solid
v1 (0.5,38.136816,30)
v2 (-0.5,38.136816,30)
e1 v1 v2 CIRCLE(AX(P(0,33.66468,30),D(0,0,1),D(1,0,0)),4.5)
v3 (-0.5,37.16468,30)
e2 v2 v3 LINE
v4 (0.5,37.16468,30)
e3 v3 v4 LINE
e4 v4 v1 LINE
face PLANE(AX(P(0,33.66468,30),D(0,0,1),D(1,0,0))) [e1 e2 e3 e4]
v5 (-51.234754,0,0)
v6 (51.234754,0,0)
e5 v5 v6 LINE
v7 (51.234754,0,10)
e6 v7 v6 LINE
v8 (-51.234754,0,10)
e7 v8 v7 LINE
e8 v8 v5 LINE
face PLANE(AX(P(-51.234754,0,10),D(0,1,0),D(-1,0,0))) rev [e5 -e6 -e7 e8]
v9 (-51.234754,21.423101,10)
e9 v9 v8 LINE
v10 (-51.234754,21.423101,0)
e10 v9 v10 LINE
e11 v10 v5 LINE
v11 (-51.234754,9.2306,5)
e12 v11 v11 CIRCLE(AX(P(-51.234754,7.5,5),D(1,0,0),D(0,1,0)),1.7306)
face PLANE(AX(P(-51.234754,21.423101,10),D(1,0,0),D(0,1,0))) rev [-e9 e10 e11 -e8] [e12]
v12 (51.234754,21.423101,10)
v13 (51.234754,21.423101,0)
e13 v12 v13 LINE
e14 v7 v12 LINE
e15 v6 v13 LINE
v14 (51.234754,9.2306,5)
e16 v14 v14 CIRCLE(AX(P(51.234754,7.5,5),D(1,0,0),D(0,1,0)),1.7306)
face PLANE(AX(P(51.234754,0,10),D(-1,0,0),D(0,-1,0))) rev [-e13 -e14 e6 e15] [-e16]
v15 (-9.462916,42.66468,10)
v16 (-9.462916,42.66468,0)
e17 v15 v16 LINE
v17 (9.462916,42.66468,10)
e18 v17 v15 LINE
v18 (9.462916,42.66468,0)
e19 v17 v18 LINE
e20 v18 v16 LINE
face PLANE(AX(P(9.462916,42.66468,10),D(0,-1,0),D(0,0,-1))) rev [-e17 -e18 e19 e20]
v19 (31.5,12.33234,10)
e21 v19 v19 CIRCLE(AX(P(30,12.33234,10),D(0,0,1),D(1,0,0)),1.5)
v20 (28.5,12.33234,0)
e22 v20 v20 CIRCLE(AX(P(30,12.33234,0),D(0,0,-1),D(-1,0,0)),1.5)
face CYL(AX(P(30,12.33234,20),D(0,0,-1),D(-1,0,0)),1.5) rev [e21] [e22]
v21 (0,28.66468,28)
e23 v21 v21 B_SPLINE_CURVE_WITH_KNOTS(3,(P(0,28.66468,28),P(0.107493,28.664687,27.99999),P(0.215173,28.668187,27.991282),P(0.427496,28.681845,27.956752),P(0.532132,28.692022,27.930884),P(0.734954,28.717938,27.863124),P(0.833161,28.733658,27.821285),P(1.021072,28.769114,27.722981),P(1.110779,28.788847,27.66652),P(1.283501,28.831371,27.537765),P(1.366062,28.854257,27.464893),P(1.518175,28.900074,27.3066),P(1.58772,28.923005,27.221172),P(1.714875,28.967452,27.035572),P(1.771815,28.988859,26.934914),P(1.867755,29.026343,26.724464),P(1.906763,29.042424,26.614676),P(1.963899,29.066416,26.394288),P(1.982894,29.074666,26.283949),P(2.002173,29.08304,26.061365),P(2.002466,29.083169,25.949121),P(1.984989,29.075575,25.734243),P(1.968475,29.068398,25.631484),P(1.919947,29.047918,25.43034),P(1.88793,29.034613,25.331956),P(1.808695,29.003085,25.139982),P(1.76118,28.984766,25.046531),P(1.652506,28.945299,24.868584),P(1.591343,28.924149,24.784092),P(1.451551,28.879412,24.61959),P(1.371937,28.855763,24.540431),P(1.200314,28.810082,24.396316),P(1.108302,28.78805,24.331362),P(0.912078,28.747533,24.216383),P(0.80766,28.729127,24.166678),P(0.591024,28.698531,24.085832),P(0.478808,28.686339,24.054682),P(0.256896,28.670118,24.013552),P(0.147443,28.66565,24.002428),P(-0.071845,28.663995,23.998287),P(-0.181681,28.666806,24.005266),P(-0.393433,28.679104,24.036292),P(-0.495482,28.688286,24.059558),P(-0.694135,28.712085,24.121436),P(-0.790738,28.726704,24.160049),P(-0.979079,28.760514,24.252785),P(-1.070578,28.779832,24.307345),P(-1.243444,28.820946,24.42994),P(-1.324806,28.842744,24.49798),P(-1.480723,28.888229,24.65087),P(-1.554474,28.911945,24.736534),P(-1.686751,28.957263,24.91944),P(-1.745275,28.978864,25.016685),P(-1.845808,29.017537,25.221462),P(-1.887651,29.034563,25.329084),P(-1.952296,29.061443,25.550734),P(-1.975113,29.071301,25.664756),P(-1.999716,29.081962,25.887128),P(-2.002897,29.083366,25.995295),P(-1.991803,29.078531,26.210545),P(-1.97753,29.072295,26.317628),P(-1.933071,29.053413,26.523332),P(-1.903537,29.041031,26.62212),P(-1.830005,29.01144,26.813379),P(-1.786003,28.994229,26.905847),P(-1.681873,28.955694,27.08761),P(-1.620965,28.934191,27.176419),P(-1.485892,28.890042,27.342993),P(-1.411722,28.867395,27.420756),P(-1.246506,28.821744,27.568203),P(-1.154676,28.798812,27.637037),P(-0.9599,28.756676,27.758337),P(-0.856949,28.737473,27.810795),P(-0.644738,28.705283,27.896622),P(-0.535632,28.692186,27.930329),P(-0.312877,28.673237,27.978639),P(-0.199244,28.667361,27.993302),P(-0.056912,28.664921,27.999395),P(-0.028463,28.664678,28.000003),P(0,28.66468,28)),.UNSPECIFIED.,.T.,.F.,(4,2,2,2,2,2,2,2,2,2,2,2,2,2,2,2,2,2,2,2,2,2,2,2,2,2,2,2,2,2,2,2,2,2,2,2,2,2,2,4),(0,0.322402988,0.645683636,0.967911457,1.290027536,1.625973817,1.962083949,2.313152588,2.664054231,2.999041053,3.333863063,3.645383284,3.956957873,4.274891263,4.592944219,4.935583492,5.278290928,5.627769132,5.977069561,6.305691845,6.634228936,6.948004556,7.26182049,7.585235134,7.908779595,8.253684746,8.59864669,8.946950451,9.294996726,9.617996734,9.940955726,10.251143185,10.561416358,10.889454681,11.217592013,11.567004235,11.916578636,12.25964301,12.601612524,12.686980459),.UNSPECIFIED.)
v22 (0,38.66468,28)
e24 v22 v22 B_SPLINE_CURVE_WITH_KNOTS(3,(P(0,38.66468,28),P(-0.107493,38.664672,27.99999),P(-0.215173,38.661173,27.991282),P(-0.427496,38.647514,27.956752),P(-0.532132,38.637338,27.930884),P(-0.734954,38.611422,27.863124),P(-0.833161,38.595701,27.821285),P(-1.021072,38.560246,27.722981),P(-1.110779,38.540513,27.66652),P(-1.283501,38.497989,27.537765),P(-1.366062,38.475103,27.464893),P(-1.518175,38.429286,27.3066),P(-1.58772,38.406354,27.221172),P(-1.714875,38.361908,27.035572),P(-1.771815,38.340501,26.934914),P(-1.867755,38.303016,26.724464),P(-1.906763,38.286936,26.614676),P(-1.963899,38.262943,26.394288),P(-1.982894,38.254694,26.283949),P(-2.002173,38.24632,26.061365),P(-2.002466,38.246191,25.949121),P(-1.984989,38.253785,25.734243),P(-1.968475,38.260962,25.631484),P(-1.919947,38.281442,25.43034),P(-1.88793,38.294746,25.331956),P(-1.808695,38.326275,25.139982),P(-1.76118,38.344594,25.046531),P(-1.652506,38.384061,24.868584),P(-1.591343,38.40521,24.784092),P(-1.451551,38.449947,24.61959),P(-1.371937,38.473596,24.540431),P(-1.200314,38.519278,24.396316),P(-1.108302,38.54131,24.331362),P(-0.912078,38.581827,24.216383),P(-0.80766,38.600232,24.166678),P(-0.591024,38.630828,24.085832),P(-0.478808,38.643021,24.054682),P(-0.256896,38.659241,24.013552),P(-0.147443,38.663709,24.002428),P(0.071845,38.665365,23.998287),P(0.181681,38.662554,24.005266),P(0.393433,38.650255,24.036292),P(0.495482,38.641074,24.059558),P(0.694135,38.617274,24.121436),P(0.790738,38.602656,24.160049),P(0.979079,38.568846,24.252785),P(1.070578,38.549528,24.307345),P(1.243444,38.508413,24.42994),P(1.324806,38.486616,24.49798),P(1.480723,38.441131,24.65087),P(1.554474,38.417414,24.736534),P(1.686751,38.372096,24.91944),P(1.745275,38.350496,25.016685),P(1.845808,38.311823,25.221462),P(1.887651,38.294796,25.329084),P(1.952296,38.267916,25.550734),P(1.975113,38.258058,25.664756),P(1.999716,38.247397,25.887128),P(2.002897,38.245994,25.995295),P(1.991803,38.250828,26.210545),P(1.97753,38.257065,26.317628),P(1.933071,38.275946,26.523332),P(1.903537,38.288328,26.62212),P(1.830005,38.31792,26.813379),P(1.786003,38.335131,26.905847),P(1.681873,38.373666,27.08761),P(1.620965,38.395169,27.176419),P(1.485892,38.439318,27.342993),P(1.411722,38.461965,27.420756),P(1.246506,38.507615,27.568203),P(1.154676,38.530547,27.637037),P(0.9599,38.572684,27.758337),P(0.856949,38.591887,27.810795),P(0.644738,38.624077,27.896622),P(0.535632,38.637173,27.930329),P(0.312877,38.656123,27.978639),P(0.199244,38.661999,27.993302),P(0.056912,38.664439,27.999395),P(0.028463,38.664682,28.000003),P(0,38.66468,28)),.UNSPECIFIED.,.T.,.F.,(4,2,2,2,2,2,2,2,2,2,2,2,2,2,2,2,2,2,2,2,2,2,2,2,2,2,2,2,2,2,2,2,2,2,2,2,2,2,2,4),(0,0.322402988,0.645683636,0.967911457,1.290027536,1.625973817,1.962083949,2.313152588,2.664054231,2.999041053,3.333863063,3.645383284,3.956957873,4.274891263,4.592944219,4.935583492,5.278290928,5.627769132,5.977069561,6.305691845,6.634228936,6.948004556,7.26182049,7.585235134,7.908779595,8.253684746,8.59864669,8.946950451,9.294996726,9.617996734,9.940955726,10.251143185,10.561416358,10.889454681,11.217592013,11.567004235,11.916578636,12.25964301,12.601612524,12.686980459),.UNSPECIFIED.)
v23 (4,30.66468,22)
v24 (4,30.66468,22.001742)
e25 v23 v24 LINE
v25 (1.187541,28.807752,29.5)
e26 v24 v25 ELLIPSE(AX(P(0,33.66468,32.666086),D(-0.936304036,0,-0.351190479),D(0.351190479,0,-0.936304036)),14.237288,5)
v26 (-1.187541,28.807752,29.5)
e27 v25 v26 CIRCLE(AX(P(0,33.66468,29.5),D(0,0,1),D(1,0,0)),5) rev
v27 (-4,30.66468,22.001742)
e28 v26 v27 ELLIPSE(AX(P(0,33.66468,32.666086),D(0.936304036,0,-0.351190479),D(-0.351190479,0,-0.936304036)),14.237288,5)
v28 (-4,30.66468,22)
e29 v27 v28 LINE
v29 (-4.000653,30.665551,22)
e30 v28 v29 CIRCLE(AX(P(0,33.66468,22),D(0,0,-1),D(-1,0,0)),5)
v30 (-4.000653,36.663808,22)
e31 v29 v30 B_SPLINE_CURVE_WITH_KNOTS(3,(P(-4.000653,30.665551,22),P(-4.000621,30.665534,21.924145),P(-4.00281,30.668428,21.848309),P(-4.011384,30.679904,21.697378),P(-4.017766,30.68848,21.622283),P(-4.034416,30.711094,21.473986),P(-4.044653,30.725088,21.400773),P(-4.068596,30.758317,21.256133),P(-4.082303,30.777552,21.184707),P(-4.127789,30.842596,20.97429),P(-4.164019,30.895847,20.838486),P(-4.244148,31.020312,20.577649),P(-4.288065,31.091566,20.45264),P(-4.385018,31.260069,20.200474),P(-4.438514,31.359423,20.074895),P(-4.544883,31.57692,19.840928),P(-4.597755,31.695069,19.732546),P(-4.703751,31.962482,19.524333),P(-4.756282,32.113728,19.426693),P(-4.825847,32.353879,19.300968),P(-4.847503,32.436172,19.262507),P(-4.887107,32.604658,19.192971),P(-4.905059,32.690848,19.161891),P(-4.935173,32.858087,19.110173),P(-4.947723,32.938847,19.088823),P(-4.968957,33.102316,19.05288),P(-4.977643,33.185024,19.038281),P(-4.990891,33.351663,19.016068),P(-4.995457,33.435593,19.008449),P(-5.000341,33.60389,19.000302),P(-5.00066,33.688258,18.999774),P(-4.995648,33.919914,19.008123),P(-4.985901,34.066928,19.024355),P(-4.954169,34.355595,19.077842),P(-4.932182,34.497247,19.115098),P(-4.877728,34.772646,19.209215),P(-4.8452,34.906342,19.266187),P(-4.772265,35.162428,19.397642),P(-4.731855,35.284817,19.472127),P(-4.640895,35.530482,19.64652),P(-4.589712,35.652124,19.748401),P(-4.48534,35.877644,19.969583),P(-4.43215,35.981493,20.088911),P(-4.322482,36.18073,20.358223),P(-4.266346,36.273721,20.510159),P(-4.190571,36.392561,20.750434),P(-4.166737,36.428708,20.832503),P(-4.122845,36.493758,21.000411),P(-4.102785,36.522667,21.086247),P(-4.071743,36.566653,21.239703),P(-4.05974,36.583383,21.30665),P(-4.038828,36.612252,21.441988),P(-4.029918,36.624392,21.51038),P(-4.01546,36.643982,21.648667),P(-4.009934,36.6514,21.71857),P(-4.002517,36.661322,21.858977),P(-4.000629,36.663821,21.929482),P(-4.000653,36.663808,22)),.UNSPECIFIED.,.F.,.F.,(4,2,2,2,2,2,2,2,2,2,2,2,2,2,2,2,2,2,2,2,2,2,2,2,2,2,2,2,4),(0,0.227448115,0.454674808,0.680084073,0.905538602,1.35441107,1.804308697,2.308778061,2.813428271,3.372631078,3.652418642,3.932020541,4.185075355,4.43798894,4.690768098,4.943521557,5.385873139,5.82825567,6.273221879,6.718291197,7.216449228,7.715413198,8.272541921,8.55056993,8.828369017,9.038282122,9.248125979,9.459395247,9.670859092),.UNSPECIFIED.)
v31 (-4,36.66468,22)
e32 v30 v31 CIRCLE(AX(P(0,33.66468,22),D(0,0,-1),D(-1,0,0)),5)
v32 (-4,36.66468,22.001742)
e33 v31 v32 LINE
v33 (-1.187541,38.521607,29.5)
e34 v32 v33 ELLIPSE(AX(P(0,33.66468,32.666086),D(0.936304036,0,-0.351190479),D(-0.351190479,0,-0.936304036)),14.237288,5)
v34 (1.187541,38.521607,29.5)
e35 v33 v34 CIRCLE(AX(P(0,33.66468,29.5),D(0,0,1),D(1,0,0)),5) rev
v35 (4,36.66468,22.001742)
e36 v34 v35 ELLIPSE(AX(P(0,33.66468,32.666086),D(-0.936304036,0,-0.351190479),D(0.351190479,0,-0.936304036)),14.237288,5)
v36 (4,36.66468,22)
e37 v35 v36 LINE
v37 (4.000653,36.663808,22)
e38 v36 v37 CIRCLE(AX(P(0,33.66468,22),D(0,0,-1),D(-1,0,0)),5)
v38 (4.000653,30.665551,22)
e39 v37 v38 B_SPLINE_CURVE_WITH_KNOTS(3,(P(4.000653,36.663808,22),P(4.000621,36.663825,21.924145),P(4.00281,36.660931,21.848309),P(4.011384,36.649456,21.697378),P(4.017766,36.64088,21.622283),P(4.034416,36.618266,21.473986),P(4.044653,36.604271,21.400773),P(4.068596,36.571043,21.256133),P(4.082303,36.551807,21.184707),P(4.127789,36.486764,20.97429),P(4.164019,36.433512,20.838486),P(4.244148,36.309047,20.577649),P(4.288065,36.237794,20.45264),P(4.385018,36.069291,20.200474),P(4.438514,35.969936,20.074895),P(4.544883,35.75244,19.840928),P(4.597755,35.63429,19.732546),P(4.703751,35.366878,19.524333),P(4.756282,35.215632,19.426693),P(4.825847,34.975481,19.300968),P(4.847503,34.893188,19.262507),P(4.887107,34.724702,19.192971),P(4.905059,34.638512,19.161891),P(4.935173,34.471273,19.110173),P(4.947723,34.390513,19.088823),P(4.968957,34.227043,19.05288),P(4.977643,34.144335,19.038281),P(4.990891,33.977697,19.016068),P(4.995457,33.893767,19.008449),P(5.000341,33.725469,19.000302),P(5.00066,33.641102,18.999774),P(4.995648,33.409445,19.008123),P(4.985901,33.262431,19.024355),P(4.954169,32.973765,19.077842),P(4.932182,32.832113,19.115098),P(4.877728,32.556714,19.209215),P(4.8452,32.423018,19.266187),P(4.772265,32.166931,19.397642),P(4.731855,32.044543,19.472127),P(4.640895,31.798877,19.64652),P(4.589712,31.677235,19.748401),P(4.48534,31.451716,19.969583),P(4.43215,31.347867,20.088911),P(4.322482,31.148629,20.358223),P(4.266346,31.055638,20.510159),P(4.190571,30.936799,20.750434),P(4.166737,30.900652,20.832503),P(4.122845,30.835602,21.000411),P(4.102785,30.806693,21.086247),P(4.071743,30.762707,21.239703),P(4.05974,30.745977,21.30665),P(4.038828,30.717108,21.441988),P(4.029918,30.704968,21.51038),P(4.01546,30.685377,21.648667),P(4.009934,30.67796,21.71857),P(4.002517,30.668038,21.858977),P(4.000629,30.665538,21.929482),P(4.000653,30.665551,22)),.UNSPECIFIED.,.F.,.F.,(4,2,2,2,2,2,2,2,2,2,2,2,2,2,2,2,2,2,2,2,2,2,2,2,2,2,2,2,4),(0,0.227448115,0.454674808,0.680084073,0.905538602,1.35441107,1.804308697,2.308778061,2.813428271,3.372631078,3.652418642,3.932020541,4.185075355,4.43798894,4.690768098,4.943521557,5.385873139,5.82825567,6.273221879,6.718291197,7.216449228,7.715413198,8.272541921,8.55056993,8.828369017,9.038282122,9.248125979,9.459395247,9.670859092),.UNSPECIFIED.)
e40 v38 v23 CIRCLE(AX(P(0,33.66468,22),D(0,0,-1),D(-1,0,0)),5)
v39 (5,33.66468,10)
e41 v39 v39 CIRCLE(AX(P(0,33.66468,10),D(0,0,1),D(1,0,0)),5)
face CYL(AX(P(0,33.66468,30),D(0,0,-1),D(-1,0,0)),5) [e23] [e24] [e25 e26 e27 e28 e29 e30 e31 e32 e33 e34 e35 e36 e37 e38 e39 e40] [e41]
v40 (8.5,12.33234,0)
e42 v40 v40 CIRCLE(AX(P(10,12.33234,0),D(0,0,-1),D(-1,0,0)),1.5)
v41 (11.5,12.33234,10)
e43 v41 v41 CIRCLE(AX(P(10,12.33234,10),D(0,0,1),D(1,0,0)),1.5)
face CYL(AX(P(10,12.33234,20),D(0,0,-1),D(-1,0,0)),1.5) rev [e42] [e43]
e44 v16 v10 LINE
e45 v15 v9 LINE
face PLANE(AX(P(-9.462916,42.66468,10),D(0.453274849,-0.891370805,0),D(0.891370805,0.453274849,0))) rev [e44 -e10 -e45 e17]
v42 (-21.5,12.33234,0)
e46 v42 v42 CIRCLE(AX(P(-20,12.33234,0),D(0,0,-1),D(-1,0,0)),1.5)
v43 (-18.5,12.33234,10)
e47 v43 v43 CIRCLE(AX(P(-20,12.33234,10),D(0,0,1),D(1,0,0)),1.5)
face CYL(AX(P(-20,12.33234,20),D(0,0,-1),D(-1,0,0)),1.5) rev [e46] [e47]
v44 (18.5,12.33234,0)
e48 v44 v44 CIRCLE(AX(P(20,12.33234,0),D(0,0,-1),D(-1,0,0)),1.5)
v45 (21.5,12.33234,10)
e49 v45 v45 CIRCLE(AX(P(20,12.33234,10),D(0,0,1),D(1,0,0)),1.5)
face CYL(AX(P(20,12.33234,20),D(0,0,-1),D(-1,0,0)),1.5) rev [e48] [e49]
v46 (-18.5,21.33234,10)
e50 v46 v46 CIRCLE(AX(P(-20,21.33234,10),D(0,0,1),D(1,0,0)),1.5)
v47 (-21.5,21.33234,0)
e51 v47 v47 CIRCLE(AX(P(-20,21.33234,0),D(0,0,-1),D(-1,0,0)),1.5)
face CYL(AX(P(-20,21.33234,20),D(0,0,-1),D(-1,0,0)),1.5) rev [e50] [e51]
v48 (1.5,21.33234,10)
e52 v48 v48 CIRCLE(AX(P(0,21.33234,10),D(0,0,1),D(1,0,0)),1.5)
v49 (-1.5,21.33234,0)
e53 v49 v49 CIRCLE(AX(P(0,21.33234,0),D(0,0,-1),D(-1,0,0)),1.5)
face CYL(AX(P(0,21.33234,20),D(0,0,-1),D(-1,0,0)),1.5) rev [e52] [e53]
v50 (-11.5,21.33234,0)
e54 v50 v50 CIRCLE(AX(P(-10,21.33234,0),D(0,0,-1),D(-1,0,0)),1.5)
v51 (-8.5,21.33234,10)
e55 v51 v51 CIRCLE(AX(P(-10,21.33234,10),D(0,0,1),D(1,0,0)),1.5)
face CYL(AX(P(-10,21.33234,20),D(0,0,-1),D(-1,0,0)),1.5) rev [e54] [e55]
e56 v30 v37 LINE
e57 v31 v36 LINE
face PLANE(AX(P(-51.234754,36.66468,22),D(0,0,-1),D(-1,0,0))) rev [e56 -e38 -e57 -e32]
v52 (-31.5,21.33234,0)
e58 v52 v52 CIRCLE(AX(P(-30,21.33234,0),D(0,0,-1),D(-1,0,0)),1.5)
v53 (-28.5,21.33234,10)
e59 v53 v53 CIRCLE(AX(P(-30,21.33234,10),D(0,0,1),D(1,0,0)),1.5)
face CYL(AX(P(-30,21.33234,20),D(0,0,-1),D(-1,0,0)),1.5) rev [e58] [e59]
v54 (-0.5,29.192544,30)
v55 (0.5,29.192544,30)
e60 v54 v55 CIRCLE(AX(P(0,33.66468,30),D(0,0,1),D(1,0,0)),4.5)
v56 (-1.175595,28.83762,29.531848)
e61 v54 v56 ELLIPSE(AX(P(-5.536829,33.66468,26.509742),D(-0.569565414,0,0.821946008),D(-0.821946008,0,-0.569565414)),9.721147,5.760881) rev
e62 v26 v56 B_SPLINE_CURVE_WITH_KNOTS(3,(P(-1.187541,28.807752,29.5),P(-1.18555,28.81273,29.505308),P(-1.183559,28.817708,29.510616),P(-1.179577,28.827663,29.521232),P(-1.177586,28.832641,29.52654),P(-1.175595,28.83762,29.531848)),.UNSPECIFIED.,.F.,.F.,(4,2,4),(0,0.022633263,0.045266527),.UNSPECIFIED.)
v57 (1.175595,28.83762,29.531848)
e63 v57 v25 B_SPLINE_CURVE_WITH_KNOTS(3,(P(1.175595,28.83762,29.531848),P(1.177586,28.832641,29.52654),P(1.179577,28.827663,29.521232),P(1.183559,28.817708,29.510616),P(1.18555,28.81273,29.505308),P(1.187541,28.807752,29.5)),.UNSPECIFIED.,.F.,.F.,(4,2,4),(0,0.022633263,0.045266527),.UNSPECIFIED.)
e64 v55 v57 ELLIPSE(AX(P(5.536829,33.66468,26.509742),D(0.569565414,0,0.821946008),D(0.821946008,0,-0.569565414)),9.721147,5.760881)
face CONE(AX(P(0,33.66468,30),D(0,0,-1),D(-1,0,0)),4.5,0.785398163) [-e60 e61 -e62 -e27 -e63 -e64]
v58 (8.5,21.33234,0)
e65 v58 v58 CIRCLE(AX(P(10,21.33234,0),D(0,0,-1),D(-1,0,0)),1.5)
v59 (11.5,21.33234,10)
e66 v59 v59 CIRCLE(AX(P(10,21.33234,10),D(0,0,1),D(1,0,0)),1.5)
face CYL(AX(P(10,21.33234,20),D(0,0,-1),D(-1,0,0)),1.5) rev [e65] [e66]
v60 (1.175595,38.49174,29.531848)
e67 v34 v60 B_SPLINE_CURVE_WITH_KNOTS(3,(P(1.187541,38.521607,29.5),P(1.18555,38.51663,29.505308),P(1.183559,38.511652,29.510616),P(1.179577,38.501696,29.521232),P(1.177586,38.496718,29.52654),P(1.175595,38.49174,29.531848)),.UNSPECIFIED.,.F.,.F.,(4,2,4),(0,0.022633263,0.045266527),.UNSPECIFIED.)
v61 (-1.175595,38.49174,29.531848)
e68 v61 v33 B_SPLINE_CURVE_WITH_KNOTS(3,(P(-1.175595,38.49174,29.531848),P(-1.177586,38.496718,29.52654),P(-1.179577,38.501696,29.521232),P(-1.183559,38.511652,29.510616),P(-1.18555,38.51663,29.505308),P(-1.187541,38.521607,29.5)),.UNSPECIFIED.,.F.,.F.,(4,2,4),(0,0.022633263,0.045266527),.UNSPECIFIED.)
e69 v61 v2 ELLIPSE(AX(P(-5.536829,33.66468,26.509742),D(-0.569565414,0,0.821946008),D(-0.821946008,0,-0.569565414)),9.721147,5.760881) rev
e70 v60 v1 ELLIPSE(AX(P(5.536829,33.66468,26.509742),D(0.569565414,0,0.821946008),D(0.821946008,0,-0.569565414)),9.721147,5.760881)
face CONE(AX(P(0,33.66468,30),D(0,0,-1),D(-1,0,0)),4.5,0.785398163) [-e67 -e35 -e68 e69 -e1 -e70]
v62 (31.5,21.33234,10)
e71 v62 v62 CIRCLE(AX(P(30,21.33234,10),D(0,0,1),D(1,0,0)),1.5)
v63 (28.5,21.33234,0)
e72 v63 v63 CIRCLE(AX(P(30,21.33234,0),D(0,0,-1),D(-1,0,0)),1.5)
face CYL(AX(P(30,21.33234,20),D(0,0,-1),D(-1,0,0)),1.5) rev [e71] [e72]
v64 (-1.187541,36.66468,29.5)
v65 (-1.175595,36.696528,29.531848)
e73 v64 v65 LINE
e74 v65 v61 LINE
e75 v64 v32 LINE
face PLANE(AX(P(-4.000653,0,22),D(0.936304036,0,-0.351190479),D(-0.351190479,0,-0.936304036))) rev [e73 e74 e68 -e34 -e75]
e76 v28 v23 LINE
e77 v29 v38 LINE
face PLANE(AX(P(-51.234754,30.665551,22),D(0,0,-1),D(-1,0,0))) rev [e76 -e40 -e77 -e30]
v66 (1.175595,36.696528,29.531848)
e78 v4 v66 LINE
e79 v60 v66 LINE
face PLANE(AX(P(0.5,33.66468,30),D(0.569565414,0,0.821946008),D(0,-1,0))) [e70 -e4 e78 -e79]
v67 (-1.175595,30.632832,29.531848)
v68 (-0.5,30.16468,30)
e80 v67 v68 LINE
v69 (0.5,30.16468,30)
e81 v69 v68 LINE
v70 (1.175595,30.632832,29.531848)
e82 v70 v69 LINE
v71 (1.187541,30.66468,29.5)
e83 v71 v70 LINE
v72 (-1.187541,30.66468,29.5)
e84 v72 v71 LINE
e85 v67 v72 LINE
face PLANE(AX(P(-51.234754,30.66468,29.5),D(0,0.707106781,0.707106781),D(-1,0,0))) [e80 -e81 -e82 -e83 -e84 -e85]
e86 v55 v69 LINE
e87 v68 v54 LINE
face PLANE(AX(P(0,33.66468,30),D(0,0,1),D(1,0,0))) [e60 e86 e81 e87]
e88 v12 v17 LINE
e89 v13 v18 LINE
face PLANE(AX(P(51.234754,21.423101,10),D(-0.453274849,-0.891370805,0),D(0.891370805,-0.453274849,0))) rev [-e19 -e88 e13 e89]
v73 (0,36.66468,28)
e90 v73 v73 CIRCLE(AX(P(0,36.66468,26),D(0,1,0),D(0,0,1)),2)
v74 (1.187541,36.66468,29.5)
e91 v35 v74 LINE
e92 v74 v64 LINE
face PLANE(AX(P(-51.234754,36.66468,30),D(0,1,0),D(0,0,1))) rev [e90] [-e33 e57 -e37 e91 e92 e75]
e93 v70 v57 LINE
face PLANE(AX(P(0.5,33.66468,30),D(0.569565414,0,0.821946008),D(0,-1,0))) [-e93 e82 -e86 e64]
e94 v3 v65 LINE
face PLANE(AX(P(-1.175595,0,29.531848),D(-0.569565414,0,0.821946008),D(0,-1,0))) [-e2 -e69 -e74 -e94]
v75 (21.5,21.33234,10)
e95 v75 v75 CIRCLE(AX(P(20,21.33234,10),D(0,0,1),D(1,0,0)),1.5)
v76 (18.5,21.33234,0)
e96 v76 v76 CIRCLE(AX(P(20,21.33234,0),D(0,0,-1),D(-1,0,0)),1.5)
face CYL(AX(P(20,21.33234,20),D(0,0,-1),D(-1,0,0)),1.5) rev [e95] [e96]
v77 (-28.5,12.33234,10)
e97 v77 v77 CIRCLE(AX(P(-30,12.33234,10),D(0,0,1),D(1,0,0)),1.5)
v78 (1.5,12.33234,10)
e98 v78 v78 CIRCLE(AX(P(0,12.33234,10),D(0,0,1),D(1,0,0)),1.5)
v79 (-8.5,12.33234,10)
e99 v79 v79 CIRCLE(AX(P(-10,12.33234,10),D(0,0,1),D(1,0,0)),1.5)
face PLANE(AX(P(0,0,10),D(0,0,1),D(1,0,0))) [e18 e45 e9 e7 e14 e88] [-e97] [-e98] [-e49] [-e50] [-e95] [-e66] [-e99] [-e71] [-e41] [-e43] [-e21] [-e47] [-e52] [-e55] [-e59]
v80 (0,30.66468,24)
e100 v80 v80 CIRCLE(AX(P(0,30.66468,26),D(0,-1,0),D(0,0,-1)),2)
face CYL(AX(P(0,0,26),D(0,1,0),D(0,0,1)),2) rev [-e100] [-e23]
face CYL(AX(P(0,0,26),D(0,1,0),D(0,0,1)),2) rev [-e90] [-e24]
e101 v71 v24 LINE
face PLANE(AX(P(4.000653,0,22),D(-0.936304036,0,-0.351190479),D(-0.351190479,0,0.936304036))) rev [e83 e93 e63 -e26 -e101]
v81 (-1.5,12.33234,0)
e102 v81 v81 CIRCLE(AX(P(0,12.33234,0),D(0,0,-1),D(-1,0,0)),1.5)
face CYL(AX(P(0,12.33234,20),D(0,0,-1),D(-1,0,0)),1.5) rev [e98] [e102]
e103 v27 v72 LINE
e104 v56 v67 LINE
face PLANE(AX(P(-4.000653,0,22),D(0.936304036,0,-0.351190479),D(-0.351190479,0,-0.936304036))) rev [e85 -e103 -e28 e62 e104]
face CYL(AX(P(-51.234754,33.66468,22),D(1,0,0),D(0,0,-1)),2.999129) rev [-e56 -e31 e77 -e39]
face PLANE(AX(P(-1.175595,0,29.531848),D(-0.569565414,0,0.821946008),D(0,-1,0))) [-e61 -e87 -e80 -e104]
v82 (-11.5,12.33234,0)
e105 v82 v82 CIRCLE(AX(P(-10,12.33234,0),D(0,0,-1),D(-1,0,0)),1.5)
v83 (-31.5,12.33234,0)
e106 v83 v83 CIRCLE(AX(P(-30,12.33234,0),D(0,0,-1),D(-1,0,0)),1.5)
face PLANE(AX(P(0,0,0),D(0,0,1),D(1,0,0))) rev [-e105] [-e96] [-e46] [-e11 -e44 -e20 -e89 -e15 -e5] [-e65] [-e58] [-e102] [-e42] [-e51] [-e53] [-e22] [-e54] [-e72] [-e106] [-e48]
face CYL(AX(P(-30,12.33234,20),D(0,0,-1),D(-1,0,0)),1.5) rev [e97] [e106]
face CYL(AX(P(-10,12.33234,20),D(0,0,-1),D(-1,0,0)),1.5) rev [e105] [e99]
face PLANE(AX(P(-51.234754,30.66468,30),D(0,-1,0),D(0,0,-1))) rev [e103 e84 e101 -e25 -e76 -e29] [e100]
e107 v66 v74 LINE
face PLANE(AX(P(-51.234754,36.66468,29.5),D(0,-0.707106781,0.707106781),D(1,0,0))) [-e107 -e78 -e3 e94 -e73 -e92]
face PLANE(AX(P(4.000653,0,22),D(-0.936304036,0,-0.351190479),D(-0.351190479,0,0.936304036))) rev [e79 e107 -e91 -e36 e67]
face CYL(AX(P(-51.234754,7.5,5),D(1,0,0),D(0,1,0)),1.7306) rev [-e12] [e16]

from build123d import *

# Parameters (mm, degrees)
BOSS_EXTRUDE1_DEPTH = 10
SKETCH10_R          = 1.5
CUT_EXTRUDE9_DEPTH  = 20
SKETCH11_R          = 1.730599661
CUT_EXTRUDE10_DEPTH = 112.446287057
SKETCH12_R          = 5
BOSS_EXTRUDE4_DEPTH = 20
CUT_EXTRUDE11_START = -10.000002096
CUT_EXTRUDE11_DEPTH = 10.000002096
SKETCH14_R          = 2
CUT_EXTRUDE12_DEPTH = 71.851658179
CHAMFER1_SIZE       = 0.5


# Read off the part's stored shape, not the designer's step: Cut-Extrude11
with BuildPart() as part:
    # Sketch1 → Boss-Extrude1 (new body)
    with BuildSketch(Plane.XY):
        Polygon((51.23475383, 0), (51.23475383, 21.423100566), (9.462915873, 42.664679757), (-9.462915873, 42.664679757), (-51.23475383, 21.423100566), (-51.23475383, 0), align=None)
    extrude(amount=BOSS_EXTRUDE1_DEPTH)

    # Sketch10 → Cut-Extrude9 (cut)
    with BuildSketch(Plane(origin=(0, 0, 0), x_dir=(-1, 0, 0), z_dir=(0, 0, -1))):
        with Locations((0, 21.332339879)):
            Circle(SKETCH10_R)
        with Locations((10, 21.332339879)):
            Circle(SKETCH10_R)
        with Locations((20, 21.332339879)):
            Circle(SKETCH10_R)
        with Locations((30, 21.332339879)):
            Circle(SKETCH10_R)
        with Locations((-10, 21.332339879)):
            Circle(SKETCH10_R)
        with Locations((-20, 21.332339879)):
            Circle(SKETCH10_R)
        with Locations((-30, 21.332339879)):
            Circle(SKETCH10_R)
        with Locations((10, 12.332339879)):
            Circle(SKETCH10_R)
        with Locations((0, 12.332339879)):
            Circle(SKETCH10_R)
        with Locations((20, 12.332339879)):
            Circle(SKETCH10_R)
        with Locations((30, 12.332339879)):
            Circle(SKETCH10_R)
        with Locations((-10, 12.332339879)):
            Circle(SKETCH10_R)
        with Locations((-20, 12.332339879)):
            Circle(SKETCH10_R)
        with Locations((-30, 12.332339879)):
            Circle(SKETCH10_R)
    extrude(amount=-CUT_EXTRUDE9_DEPTH, mode=Mode.SUBTRACT)

    # Sketch11 → Cut-Extrude10 (cut, through all)
    with BuildSketch(Plane(origin=(51.23475383, 0, 0), x_dir=(0, 0, -1), z_dir=(1, 0, 0))):
        with Locations(Location((-5, 7.5, 0), (0, 0, 90))):
            Circle(SKETCH11_R)
    extrude(amount=-CUT_EXTRUDE10_DEPTH, mode=Mode.SUBTRACT)

    # Sketch12 → Boss-Extrude4 (add)
    with BuildSketch(Plane.XY.offset(10)):
        with Locations((0, 33.664679757)):
            Circle(SKETCH12_R)
    extrude(amount=BOSS_EXTRUDE4_DEPTH)

    # Cut-Extrude11 outline → Cut-Extrude11 (cut)
    with BuildSketch(Plane(origin=(5, 0, 0), x_dir=(0, 0, -1), z_dir=(1, 0, 0)).offset(CUT_EXTRUDE11_START)):
        with BuildLine():
            ThreePointArc((-22, 30.665551075), (-19.000871318, 33.664679757), (-22, 36.663808439))
            Line((-22, 36.663808439), (-22, 36.664679757))
            Line((-22, 36.664679757), (-30, 36.664679757))
            Line((-30, 36.664679757), (-30, 30.664679757))
            Line((-30, 30.664679757), (-22, 30.664679757))
            Line((-22, 30.664679757), (-22, 30.665551075))
        make_face()
    extrude(amount=CUT_EXTRUDE11_DEPTH, mode=Mode.SUBTRACT)

    # Sketch14 → Cut-Extrude12 (cut, through all)
    with BuildSketch(Plane(origin=(0, 38.664679757, 0), x_dir=(1, 0, 0), z_dir=(0, 1, 0))):
        with Locations(Location((0, -26, 0), (0, 0, 270))):
            Circle(SKETCH14_R)
        Polygon((-4.00065334, -22), (-1, -30), (-4, -30), align=None)
        Polygon((1, -30), (4, -30), (4.00065334, -22), align=None)
    extrude(amount=-CUT_EXTRUDE12_DEPTH, mode=Mode.SUBTRACT)

    # Chamfer1
    chamfer1_edges = [part.edges().sort_by_distance(p)[0] for p in [
        (1, 29.715190014, 30),
        (1, 37.6141695, 30),
        (0, 36.664679757, 30),
        (0, 28.664679757, 30),
        (0, 38.664679757, 30),
        (0, 30.664679757, 30),
        (-1, 29.715190014, 30),
        (-1, 37.6141695, 30),
    ]]
    chamfer(chamfer1_edges, length=CHAMFER1_SIZE)


solid = part.part
